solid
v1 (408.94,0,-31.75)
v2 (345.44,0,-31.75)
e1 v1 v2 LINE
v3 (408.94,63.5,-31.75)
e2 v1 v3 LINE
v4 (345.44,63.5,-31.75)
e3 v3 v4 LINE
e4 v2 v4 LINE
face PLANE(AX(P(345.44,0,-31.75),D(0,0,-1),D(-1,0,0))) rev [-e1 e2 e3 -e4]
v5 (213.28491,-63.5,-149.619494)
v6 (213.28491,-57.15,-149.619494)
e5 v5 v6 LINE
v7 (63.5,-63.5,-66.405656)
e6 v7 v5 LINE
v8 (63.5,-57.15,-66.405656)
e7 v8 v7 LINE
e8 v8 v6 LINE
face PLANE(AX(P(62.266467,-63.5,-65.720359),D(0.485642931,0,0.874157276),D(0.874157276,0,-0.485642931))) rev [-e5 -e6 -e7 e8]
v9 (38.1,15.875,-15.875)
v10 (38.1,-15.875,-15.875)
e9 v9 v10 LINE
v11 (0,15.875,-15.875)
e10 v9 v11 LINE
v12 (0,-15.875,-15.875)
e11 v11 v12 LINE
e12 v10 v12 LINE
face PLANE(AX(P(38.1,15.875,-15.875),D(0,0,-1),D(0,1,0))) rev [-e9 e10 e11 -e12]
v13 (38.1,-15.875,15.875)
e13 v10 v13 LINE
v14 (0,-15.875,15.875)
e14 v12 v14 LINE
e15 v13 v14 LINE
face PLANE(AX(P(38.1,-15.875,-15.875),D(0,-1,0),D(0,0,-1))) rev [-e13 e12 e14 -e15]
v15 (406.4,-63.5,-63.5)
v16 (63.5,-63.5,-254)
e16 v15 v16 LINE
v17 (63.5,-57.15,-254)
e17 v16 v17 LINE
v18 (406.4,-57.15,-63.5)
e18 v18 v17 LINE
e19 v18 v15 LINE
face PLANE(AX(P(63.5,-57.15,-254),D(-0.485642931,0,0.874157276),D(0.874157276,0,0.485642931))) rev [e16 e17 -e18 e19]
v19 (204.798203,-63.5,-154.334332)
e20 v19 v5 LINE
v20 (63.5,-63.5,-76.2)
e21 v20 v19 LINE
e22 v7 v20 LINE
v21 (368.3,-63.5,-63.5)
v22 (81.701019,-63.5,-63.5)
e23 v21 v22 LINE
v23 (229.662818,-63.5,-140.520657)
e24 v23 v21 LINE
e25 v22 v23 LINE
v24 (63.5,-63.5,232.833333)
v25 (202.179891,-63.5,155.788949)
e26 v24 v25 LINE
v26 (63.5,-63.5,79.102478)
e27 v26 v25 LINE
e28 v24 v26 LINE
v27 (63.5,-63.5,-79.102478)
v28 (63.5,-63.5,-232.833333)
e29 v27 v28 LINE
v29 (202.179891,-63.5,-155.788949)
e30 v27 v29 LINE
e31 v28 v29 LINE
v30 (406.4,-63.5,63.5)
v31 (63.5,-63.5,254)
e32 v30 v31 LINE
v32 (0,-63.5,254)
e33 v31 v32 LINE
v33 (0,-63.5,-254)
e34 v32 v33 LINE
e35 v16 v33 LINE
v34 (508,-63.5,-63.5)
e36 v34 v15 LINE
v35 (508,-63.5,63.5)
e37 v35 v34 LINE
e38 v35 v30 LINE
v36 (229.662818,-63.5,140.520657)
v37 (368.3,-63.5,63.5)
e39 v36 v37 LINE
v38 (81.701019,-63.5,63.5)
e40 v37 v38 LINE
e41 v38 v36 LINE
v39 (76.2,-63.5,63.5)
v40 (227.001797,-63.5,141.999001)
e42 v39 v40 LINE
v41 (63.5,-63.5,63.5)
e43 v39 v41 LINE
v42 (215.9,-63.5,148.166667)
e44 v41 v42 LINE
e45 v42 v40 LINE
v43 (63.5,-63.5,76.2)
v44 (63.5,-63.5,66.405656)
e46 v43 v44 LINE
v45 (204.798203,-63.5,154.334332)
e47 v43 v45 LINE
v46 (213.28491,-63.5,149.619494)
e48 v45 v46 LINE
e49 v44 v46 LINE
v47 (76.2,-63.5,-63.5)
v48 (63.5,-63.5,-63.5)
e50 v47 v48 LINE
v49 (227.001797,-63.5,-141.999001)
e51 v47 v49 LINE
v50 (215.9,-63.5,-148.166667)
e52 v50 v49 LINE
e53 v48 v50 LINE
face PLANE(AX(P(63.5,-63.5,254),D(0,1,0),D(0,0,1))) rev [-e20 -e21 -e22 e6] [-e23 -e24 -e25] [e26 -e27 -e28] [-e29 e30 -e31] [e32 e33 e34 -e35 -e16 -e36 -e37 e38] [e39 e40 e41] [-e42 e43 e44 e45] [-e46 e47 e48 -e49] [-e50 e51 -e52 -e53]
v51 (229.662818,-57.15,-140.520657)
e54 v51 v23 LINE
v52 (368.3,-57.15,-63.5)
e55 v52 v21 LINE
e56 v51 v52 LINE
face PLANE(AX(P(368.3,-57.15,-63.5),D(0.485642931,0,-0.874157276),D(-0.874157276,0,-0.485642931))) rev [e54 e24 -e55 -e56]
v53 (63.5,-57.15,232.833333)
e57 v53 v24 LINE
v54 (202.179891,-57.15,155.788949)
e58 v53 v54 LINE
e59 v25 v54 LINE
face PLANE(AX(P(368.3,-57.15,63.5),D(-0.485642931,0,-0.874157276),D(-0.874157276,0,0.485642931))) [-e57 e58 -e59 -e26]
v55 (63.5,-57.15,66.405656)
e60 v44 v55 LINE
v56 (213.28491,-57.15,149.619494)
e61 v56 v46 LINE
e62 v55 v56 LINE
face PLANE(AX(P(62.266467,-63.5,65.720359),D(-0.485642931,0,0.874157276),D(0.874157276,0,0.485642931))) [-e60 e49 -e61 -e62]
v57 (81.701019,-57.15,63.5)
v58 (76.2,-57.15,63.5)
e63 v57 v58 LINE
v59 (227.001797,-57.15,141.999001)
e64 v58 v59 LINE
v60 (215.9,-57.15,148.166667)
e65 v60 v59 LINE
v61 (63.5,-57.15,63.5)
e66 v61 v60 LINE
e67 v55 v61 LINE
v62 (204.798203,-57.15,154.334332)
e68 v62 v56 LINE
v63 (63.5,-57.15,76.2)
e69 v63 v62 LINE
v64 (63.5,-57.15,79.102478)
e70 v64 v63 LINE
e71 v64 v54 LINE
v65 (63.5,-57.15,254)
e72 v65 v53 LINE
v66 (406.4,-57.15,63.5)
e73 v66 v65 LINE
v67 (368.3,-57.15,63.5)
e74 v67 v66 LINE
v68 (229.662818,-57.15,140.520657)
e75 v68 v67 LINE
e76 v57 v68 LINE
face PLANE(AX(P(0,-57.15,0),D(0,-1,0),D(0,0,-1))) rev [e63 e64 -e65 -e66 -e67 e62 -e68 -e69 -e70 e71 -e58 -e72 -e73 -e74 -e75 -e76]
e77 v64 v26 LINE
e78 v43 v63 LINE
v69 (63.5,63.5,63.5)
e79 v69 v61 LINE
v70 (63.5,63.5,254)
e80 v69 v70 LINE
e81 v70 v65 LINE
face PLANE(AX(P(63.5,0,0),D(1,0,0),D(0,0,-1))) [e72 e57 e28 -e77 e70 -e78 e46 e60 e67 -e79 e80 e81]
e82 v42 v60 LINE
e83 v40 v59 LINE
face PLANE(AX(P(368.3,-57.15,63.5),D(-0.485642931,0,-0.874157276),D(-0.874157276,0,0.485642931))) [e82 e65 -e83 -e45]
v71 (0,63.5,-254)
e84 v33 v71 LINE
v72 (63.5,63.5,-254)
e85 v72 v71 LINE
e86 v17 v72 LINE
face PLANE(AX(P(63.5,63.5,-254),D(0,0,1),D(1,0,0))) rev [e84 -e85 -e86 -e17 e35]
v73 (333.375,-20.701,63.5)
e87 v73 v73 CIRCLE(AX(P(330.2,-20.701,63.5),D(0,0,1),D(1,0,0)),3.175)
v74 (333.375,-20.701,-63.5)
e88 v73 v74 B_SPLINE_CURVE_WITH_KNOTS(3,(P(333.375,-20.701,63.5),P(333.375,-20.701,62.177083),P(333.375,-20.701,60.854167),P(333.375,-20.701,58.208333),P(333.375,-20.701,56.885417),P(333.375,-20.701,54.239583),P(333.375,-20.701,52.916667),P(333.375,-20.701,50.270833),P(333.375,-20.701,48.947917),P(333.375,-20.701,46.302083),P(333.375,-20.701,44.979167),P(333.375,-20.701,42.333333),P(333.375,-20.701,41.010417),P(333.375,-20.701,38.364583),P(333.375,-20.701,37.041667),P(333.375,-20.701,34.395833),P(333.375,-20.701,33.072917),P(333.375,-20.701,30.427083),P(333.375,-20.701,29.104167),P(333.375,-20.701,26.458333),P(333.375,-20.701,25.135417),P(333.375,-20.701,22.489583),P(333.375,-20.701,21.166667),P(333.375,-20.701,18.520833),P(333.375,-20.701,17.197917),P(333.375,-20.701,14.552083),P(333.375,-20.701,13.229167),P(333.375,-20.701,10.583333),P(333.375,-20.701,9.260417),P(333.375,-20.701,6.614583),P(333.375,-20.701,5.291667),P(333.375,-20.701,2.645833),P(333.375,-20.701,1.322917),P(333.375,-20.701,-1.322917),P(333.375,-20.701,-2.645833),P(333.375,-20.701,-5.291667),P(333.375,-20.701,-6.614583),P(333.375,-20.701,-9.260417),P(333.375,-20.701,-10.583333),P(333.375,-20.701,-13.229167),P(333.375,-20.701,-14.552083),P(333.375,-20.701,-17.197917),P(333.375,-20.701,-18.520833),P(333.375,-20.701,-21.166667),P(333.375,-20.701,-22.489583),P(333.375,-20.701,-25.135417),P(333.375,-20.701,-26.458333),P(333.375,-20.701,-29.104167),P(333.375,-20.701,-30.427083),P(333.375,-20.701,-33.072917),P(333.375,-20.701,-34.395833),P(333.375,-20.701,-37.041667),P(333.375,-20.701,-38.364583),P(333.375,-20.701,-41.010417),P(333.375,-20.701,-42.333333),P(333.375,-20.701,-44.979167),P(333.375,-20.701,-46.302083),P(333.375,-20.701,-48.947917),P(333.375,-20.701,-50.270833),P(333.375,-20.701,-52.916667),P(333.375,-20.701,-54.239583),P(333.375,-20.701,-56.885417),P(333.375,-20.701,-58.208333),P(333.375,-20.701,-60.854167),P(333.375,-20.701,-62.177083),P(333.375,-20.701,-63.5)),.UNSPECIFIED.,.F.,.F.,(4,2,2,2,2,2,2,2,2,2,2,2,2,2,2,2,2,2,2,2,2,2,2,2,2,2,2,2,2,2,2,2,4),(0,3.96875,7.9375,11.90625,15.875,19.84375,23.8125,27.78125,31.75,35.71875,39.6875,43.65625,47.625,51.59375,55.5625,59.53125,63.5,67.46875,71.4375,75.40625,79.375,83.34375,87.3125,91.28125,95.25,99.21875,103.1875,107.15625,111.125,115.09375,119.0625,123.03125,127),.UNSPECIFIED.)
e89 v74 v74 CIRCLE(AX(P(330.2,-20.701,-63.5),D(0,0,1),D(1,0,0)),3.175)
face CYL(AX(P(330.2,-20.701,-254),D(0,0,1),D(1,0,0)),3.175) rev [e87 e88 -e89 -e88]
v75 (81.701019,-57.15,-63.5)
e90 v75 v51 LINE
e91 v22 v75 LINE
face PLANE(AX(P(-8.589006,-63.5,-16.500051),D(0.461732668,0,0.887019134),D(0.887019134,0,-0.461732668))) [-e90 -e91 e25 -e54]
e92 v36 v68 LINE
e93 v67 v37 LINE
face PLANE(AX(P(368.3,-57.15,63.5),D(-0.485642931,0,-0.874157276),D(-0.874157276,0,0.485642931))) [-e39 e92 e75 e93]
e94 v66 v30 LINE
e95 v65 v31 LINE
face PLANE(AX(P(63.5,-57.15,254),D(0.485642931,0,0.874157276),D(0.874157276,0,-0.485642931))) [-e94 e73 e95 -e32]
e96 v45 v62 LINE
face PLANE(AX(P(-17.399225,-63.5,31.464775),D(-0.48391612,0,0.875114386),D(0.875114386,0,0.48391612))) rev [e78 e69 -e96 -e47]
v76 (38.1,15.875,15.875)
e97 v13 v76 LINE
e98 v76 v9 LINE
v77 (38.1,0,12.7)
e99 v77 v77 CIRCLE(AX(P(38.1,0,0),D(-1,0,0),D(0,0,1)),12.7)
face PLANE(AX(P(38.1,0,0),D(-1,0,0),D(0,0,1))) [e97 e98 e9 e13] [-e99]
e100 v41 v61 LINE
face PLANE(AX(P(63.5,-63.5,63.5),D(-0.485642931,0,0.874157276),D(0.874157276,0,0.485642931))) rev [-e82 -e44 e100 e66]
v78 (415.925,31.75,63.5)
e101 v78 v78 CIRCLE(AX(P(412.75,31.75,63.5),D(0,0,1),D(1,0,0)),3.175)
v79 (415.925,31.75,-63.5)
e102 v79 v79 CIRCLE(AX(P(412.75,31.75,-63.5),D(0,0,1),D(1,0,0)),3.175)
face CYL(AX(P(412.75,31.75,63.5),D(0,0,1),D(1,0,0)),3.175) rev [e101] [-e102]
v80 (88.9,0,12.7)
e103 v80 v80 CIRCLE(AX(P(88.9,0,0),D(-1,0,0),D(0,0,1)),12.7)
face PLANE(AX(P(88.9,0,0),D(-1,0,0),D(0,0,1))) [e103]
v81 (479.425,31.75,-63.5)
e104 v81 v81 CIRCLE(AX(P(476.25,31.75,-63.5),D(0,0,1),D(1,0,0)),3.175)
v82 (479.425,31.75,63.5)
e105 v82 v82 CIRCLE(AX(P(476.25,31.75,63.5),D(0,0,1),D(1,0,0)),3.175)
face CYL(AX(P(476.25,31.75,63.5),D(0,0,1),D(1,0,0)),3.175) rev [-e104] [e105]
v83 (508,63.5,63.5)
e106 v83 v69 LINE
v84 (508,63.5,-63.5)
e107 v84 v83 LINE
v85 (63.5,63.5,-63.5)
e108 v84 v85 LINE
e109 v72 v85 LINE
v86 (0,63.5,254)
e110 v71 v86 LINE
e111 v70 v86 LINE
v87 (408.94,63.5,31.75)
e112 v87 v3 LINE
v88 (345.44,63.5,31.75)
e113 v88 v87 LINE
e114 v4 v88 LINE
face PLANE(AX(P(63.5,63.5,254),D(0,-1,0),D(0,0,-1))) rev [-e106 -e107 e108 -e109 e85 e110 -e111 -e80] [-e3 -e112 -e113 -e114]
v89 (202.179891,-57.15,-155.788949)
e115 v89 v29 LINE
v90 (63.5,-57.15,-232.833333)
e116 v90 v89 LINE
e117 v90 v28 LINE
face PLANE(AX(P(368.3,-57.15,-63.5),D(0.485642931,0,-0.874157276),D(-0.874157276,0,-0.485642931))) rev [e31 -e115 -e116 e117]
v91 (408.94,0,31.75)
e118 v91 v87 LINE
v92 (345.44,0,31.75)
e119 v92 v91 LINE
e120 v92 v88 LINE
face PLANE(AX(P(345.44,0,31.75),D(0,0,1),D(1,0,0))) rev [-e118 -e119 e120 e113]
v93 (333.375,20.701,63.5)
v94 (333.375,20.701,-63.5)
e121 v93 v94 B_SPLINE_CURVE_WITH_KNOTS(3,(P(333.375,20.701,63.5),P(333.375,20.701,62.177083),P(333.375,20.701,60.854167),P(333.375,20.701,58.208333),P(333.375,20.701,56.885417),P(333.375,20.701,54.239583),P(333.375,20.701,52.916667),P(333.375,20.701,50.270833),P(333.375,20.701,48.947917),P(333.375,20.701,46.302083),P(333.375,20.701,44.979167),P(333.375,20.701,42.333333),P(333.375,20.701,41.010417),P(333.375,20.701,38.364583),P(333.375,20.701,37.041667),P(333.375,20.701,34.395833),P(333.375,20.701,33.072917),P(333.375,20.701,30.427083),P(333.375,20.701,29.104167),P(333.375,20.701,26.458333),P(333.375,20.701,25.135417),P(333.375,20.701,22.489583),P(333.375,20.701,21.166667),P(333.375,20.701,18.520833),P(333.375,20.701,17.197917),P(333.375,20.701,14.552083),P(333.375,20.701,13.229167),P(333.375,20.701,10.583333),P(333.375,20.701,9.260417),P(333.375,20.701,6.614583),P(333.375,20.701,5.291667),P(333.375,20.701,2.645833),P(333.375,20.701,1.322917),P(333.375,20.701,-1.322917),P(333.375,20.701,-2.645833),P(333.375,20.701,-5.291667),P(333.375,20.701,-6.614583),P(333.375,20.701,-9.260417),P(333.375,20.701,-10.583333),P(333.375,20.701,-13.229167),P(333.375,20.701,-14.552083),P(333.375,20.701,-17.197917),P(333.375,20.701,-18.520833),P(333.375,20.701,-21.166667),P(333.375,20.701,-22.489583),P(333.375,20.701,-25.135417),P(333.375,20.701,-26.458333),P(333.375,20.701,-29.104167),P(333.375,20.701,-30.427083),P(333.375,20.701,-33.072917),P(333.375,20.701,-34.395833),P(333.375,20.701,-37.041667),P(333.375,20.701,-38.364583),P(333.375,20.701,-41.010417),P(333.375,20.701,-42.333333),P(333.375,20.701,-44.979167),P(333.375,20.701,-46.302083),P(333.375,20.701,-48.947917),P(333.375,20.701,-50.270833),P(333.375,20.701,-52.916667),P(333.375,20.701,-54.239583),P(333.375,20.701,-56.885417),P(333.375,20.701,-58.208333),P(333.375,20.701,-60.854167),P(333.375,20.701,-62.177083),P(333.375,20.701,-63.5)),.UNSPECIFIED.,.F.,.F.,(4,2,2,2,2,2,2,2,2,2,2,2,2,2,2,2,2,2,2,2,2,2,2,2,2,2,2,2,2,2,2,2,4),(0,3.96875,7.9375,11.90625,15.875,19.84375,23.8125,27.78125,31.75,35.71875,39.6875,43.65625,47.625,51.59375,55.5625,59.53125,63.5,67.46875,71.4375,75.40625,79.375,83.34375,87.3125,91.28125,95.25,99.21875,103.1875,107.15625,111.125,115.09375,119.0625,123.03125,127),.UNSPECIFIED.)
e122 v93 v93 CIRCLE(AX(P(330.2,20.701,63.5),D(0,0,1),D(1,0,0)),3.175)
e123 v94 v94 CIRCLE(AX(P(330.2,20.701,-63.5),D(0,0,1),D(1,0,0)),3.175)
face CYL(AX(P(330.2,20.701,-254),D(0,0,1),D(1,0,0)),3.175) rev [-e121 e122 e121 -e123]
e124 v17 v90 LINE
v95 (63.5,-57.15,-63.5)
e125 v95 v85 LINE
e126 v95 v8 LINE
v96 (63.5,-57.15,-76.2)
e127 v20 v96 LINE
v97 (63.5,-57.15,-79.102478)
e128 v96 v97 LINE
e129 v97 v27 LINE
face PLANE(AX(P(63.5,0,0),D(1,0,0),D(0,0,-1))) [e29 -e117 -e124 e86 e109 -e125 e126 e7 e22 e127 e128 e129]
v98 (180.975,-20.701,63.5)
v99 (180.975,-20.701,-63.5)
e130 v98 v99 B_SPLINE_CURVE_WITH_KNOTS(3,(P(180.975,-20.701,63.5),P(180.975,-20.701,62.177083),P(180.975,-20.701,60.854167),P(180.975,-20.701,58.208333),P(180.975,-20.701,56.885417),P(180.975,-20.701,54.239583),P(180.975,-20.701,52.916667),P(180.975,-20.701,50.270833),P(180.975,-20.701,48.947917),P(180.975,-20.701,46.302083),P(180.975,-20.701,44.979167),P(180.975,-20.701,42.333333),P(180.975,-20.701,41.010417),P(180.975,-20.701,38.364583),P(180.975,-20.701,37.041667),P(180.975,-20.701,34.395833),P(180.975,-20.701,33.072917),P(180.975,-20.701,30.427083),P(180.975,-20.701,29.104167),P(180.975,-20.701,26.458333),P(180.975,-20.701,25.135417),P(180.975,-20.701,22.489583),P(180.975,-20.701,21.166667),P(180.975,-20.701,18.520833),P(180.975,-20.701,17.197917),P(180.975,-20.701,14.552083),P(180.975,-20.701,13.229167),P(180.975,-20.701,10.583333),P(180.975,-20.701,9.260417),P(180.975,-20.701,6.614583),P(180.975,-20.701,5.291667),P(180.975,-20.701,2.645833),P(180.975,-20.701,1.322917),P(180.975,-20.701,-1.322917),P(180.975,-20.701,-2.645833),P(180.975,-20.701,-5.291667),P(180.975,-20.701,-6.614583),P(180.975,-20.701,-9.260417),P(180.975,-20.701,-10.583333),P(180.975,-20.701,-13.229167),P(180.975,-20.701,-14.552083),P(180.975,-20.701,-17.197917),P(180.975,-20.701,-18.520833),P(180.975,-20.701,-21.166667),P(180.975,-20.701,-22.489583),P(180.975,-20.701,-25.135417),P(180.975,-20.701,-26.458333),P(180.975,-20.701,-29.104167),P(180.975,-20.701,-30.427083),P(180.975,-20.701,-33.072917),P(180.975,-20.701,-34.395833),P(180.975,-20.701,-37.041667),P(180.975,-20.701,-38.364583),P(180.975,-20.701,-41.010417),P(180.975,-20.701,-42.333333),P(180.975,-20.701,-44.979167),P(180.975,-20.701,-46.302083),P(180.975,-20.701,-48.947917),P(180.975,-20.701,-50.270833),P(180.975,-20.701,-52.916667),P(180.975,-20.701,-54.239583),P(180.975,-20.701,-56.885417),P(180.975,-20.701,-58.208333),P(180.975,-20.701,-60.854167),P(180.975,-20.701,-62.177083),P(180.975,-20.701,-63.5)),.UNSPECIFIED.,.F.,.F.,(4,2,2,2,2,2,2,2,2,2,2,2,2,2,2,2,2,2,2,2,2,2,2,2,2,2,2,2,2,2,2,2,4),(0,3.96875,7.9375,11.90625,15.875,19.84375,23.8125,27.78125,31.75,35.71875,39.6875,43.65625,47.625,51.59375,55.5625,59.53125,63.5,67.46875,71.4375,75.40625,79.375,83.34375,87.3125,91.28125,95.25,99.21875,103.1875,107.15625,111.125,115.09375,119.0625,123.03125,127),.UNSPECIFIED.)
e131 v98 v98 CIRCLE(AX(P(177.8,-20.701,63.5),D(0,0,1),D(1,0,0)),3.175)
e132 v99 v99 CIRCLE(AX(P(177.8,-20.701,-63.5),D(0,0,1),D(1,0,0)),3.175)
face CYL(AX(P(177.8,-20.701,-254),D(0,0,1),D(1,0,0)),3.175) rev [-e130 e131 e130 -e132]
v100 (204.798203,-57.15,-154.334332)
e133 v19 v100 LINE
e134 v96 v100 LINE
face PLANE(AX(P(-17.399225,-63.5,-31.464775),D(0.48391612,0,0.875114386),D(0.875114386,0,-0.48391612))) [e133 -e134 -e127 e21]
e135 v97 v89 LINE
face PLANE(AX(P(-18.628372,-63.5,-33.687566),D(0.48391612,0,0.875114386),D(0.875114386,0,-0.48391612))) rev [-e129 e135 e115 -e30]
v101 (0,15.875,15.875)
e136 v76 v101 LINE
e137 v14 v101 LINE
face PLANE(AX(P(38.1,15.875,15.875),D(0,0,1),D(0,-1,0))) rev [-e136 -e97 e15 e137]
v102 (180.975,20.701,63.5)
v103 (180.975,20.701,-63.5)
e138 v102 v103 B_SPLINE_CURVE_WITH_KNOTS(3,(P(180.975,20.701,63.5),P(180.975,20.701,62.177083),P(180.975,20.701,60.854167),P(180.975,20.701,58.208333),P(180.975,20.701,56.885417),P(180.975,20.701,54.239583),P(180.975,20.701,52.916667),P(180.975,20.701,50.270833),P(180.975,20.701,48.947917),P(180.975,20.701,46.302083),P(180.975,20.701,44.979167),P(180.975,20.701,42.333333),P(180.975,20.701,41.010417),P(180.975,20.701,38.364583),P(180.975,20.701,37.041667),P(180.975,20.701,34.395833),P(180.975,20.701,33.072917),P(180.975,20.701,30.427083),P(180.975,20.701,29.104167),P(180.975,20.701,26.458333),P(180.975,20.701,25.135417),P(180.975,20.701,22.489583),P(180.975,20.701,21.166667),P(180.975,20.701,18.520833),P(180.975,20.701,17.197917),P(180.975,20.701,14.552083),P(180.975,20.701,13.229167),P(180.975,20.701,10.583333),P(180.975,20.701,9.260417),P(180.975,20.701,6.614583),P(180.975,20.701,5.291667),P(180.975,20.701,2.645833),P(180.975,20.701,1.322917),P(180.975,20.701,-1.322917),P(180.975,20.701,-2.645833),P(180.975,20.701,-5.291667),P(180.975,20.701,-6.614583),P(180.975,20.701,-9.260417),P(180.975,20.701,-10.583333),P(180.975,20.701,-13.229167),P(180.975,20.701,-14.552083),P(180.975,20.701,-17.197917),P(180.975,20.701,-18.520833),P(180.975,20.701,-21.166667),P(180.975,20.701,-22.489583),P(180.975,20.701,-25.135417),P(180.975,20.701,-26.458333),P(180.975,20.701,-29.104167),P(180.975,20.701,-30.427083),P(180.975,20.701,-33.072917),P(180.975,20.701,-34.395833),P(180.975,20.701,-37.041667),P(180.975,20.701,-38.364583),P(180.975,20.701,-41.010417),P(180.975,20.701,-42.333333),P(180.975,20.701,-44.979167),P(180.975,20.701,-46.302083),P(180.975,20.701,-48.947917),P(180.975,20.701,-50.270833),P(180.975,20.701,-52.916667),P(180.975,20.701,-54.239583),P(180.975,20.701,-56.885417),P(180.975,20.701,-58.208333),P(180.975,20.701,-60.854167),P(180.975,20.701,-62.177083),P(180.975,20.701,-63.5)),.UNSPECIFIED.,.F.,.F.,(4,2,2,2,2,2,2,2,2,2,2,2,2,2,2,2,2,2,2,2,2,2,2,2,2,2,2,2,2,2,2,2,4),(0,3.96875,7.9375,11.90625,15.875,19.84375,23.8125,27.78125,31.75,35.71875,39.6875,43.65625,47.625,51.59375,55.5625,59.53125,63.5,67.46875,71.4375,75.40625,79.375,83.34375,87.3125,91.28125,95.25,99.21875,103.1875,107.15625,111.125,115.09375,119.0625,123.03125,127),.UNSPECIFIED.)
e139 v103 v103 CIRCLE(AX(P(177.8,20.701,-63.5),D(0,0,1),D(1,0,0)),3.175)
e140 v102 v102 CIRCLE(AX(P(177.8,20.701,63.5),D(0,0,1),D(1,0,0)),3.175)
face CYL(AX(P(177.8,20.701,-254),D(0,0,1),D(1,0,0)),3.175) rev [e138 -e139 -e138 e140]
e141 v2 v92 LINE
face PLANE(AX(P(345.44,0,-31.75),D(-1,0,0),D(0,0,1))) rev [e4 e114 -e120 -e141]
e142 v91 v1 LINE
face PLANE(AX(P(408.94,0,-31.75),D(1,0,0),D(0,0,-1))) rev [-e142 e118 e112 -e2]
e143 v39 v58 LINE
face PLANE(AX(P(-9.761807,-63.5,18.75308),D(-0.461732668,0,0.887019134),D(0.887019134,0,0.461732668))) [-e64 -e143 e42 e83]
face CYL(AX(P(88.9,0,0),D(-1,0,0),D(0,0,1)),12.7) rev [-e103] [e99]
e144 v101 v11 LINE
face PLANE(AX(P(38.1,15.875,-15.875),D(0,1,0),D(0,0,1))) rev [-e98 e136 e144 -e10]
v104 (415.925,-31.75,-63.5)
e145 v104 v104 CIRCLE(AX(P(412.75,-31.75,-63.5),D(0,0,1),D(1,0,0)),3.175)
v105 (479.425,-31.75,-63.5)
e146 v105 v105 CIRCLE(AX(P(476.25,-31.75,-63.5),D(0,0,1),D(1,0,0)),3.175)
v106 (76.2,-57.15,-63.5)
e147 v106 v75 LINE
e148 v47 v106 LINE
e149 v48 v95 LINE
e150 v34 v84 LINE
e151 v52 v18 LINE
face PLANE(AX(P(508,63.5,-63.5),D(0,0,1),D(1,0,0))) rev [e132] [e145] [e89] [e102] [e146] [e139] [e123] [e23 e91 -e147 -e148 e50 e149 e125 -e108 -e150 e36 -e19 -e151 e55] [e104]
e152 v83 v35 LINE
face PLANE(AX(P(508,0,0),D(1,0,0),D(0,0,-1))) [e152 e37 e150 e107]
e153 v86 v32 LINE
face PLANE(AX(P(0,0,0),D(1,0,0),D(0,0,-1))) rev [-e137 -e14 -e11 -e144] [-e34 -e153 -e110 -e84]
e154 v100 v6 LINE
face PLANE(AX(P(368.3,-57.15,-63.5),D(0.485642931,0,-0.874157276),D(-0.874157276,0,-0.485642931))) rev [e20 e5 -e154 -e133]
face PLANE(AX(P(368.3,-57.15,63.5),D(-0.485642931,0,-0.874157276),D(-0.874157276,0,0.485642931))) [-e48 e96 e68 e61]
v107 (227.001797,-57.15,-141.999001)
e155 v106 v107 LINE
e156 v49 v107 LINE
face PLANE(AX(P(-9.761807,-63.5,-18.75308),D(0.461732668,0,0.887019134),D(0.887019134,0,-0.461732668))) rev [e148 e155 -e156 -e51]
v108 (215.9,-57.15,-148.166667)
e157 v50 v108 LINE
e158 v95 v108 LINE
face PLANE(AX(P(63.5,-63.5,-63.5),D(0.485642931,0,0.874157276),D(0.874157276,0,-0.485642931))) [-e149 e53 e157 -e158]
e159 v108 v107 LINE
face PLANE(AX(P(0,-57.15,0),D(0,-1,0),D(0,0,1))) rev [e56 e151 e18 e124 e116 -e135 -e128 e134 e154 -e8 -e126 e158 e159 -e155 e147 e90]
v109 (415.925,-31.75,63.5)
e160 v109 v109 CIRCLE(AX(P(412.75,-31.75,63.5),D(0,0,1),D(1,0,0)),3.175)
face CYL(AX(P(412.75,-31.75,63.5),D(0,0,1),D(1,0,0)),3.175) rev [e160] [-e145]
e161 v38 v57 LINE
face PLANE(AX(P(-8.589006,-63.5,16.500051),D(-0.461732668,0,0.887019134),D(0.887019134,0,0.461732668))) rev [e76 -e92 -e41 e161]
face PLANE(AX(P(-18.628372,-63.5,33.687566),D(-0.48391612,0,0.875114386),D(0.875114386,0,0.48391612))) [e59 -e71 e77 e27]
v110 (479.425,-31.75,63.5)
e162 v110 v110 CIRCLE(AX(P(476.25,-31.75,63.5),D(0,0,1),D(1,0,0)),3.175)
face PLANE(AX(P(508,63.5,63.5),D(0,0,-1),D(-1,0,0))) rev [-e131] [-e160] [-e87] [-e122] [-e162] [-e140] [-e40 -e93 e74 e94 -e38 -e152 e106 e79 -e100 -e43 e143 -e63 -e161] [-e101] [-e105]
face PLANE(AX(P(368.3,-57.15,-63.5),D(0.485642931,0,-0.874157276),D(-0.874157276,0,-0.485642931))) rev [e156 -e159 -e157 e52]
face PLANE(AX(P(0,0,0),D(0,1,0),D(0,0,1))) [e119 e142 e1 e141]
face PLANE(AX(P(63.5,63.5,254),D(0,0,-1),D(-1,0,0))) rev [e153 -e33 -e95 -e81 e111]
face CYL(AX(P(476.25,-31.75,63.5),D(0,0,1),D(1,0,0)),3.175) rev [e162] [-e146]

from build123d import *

# Parameters (mm, degrees)
SKETCH2_W                   = 508
SKETCH2_H                   = 127
BOSS_EXTRUDE1_DEPTH         = 63.5
SKETCH3_W                   = 127
SKETCH3_H                   = 127
BOSS_EXTRUDE2_DEPTH         = 444.5
SKETCH4_W                   = 31.75
SKETCH4_H                   = 31.75
CUT_EXTRUDE1_DEPTH          = 38.1
SKETCH5_R                   = 12.7
CUT_EXTRUDE2_DEPTH          = 50.8
SKETCH6_W                   = 63.5
SKETCH6_H                   = 63.5
CUT_EXTRUDE3_DEPTH          = 63.5
F_1_4_0_25_DIAMETER_HOLE1_D = 6.35
BOSS_EXTRUDE3_DEPTH         = 6.35
EXTRUDE_THIN1_START         = -6.35
EXTRUDE_THIN1_DEPTH         = 6.35
SKETCH12_R                  = 3.175
CUT_EXTRUDE4_DEPTH          = 603.413894262


# Read off the part's stored shape, not the designer's step: Extrude-Thin1
with BuildPart() as part:
    # Sketch2 → Boss-Extrude1 (new body)
    with BuildSketch(Plane(origin=(0, 0, 0), x_dir=(0, 0, -1), z_dir=(1, 0, 0))):
        Rectangle(SKETCH2_W, SKETCH2_H)
    extrude(amount=BOSS_EXTRUDE1_DEPTH)

    # Sketch3 → Boss-Extrude2 (add)
    with BuildSketch(Plane(origin=(63.5, 0, 0), x_dir=(0, 0, -1), z_dir=(1, 0, 0))):
        Rectangle(SKETCH3_W, SKETCH3_H)
    extrude(amount=BOSS_EXTRUDE2_DEPTH)

    # Sketch4 → Cut-Extrude1 (cut)
    with BuildSketch(Plane.ZY):
        Rectangle(SKETCH4_W, SKETCH4_H)
    extrude(amount=-CUT_EXTRUDE1_DEPTH, mode=Mode.SUBTRACT)

    # Sketch5 → Cut-Extrude2 (cut)
    with BuildSketch(Plane.ZY.offset(-38.1)):
        Circle(SKETCH5_R)
    extrude(amount=-CUT_EXTRUDE2_DEPTH, mode=Mode.SUBTRACT)

    # Sketch6 → Cut-Extrude3 (cut)
    with BuildSketch(Plane(origin=(0, 63.5, 0), x_dir=(1, 0, 0), z_dir=(0, 1, 0))):
        with Locations((377.19, 0)):
            Rectangle(SKETCH6_W, SKETCH6_H)
    extrude(amount=-CUT_EXTRUDE3_DEPTH, mode=Mode.SUBTRACT)

    # 1/4 (0.25) Diameter Hole1 (through all)
    with Locations(Plane.XY.offset(63.5)):
        with Locations((476.25, -31.75), (412.75, -31.75), (412.75, 31.75), (476.25, 31.75)):
            Hole(F_1_4_0_25_DIAMETER_HOLE1_D / 2)

    # Sketch10 → Boss-Extrude3 (add)
    with BuildSketch(Plane.XZ.offset(63.5)):
        Polygon((63.5, 254), (406.4, 63.5), (368.3, 63.5), (63.5, 232.833333333), align=None)
    boss_extrude3 = extrude(amount=-BOSS_EXTRUDE3_DEPTH)

    # Mirror1: Boss-Extrude3 across plane
    add(boss_extrude3.mirror(Plane.XY))

    # Extrude-Thin1 outline → Extrude-Thin1 (add)
    with BuildSketch(Plane(origin=(0, -57.15, 0), x_dir=(1, 0, 0), z_dir=(0, 1, 0)).offset(EXTRUDE_THIN1_START)):
        Polygon((81.701018612, -63.5), (76.2, -63.5), (227.001797407, -141.999001441), (229.66281775, -140.520656806), align=None)
        Polygon((215.9, -148.166666667), (63.5, -63.5), (63.5, -66.405655618), (213.284909944, -149.619494475), align=None)
        Polygon((204.798202593, -154.334331893), (63.5, -76.2), (63.5, -79.10247771), (202.17989093, -155.788949483), align=None)
    extrude_thin1 = extrude(amount=EXTRUDE_THIN1_DEPTH)

    # Mirror2: Extrude-Thin1 across plane
    add(extrude_thin1.mirror(Plane.XY))

    # Sketch12 → Cut-Extrude4 (cut, through all)
    with BuildSketch(Plane.XY.offset(63.5)):
        with Locations((177.8, 20.701)):
            Circle(SKETCH12_R)
        with Locations((177.8, -20.701)):
            Circle(SKETCH12_R)
        with Locations((330.2, 20.701)):
            Circle(SKETCH12_R)
        with Locations((330.2, -20.701)):
            Circle(SKETCH12_R)
    extrude(amount=-CUT_EXTRUDE4_DEPTH, mode=Mode.SUBTRACT)


solid = part.part
